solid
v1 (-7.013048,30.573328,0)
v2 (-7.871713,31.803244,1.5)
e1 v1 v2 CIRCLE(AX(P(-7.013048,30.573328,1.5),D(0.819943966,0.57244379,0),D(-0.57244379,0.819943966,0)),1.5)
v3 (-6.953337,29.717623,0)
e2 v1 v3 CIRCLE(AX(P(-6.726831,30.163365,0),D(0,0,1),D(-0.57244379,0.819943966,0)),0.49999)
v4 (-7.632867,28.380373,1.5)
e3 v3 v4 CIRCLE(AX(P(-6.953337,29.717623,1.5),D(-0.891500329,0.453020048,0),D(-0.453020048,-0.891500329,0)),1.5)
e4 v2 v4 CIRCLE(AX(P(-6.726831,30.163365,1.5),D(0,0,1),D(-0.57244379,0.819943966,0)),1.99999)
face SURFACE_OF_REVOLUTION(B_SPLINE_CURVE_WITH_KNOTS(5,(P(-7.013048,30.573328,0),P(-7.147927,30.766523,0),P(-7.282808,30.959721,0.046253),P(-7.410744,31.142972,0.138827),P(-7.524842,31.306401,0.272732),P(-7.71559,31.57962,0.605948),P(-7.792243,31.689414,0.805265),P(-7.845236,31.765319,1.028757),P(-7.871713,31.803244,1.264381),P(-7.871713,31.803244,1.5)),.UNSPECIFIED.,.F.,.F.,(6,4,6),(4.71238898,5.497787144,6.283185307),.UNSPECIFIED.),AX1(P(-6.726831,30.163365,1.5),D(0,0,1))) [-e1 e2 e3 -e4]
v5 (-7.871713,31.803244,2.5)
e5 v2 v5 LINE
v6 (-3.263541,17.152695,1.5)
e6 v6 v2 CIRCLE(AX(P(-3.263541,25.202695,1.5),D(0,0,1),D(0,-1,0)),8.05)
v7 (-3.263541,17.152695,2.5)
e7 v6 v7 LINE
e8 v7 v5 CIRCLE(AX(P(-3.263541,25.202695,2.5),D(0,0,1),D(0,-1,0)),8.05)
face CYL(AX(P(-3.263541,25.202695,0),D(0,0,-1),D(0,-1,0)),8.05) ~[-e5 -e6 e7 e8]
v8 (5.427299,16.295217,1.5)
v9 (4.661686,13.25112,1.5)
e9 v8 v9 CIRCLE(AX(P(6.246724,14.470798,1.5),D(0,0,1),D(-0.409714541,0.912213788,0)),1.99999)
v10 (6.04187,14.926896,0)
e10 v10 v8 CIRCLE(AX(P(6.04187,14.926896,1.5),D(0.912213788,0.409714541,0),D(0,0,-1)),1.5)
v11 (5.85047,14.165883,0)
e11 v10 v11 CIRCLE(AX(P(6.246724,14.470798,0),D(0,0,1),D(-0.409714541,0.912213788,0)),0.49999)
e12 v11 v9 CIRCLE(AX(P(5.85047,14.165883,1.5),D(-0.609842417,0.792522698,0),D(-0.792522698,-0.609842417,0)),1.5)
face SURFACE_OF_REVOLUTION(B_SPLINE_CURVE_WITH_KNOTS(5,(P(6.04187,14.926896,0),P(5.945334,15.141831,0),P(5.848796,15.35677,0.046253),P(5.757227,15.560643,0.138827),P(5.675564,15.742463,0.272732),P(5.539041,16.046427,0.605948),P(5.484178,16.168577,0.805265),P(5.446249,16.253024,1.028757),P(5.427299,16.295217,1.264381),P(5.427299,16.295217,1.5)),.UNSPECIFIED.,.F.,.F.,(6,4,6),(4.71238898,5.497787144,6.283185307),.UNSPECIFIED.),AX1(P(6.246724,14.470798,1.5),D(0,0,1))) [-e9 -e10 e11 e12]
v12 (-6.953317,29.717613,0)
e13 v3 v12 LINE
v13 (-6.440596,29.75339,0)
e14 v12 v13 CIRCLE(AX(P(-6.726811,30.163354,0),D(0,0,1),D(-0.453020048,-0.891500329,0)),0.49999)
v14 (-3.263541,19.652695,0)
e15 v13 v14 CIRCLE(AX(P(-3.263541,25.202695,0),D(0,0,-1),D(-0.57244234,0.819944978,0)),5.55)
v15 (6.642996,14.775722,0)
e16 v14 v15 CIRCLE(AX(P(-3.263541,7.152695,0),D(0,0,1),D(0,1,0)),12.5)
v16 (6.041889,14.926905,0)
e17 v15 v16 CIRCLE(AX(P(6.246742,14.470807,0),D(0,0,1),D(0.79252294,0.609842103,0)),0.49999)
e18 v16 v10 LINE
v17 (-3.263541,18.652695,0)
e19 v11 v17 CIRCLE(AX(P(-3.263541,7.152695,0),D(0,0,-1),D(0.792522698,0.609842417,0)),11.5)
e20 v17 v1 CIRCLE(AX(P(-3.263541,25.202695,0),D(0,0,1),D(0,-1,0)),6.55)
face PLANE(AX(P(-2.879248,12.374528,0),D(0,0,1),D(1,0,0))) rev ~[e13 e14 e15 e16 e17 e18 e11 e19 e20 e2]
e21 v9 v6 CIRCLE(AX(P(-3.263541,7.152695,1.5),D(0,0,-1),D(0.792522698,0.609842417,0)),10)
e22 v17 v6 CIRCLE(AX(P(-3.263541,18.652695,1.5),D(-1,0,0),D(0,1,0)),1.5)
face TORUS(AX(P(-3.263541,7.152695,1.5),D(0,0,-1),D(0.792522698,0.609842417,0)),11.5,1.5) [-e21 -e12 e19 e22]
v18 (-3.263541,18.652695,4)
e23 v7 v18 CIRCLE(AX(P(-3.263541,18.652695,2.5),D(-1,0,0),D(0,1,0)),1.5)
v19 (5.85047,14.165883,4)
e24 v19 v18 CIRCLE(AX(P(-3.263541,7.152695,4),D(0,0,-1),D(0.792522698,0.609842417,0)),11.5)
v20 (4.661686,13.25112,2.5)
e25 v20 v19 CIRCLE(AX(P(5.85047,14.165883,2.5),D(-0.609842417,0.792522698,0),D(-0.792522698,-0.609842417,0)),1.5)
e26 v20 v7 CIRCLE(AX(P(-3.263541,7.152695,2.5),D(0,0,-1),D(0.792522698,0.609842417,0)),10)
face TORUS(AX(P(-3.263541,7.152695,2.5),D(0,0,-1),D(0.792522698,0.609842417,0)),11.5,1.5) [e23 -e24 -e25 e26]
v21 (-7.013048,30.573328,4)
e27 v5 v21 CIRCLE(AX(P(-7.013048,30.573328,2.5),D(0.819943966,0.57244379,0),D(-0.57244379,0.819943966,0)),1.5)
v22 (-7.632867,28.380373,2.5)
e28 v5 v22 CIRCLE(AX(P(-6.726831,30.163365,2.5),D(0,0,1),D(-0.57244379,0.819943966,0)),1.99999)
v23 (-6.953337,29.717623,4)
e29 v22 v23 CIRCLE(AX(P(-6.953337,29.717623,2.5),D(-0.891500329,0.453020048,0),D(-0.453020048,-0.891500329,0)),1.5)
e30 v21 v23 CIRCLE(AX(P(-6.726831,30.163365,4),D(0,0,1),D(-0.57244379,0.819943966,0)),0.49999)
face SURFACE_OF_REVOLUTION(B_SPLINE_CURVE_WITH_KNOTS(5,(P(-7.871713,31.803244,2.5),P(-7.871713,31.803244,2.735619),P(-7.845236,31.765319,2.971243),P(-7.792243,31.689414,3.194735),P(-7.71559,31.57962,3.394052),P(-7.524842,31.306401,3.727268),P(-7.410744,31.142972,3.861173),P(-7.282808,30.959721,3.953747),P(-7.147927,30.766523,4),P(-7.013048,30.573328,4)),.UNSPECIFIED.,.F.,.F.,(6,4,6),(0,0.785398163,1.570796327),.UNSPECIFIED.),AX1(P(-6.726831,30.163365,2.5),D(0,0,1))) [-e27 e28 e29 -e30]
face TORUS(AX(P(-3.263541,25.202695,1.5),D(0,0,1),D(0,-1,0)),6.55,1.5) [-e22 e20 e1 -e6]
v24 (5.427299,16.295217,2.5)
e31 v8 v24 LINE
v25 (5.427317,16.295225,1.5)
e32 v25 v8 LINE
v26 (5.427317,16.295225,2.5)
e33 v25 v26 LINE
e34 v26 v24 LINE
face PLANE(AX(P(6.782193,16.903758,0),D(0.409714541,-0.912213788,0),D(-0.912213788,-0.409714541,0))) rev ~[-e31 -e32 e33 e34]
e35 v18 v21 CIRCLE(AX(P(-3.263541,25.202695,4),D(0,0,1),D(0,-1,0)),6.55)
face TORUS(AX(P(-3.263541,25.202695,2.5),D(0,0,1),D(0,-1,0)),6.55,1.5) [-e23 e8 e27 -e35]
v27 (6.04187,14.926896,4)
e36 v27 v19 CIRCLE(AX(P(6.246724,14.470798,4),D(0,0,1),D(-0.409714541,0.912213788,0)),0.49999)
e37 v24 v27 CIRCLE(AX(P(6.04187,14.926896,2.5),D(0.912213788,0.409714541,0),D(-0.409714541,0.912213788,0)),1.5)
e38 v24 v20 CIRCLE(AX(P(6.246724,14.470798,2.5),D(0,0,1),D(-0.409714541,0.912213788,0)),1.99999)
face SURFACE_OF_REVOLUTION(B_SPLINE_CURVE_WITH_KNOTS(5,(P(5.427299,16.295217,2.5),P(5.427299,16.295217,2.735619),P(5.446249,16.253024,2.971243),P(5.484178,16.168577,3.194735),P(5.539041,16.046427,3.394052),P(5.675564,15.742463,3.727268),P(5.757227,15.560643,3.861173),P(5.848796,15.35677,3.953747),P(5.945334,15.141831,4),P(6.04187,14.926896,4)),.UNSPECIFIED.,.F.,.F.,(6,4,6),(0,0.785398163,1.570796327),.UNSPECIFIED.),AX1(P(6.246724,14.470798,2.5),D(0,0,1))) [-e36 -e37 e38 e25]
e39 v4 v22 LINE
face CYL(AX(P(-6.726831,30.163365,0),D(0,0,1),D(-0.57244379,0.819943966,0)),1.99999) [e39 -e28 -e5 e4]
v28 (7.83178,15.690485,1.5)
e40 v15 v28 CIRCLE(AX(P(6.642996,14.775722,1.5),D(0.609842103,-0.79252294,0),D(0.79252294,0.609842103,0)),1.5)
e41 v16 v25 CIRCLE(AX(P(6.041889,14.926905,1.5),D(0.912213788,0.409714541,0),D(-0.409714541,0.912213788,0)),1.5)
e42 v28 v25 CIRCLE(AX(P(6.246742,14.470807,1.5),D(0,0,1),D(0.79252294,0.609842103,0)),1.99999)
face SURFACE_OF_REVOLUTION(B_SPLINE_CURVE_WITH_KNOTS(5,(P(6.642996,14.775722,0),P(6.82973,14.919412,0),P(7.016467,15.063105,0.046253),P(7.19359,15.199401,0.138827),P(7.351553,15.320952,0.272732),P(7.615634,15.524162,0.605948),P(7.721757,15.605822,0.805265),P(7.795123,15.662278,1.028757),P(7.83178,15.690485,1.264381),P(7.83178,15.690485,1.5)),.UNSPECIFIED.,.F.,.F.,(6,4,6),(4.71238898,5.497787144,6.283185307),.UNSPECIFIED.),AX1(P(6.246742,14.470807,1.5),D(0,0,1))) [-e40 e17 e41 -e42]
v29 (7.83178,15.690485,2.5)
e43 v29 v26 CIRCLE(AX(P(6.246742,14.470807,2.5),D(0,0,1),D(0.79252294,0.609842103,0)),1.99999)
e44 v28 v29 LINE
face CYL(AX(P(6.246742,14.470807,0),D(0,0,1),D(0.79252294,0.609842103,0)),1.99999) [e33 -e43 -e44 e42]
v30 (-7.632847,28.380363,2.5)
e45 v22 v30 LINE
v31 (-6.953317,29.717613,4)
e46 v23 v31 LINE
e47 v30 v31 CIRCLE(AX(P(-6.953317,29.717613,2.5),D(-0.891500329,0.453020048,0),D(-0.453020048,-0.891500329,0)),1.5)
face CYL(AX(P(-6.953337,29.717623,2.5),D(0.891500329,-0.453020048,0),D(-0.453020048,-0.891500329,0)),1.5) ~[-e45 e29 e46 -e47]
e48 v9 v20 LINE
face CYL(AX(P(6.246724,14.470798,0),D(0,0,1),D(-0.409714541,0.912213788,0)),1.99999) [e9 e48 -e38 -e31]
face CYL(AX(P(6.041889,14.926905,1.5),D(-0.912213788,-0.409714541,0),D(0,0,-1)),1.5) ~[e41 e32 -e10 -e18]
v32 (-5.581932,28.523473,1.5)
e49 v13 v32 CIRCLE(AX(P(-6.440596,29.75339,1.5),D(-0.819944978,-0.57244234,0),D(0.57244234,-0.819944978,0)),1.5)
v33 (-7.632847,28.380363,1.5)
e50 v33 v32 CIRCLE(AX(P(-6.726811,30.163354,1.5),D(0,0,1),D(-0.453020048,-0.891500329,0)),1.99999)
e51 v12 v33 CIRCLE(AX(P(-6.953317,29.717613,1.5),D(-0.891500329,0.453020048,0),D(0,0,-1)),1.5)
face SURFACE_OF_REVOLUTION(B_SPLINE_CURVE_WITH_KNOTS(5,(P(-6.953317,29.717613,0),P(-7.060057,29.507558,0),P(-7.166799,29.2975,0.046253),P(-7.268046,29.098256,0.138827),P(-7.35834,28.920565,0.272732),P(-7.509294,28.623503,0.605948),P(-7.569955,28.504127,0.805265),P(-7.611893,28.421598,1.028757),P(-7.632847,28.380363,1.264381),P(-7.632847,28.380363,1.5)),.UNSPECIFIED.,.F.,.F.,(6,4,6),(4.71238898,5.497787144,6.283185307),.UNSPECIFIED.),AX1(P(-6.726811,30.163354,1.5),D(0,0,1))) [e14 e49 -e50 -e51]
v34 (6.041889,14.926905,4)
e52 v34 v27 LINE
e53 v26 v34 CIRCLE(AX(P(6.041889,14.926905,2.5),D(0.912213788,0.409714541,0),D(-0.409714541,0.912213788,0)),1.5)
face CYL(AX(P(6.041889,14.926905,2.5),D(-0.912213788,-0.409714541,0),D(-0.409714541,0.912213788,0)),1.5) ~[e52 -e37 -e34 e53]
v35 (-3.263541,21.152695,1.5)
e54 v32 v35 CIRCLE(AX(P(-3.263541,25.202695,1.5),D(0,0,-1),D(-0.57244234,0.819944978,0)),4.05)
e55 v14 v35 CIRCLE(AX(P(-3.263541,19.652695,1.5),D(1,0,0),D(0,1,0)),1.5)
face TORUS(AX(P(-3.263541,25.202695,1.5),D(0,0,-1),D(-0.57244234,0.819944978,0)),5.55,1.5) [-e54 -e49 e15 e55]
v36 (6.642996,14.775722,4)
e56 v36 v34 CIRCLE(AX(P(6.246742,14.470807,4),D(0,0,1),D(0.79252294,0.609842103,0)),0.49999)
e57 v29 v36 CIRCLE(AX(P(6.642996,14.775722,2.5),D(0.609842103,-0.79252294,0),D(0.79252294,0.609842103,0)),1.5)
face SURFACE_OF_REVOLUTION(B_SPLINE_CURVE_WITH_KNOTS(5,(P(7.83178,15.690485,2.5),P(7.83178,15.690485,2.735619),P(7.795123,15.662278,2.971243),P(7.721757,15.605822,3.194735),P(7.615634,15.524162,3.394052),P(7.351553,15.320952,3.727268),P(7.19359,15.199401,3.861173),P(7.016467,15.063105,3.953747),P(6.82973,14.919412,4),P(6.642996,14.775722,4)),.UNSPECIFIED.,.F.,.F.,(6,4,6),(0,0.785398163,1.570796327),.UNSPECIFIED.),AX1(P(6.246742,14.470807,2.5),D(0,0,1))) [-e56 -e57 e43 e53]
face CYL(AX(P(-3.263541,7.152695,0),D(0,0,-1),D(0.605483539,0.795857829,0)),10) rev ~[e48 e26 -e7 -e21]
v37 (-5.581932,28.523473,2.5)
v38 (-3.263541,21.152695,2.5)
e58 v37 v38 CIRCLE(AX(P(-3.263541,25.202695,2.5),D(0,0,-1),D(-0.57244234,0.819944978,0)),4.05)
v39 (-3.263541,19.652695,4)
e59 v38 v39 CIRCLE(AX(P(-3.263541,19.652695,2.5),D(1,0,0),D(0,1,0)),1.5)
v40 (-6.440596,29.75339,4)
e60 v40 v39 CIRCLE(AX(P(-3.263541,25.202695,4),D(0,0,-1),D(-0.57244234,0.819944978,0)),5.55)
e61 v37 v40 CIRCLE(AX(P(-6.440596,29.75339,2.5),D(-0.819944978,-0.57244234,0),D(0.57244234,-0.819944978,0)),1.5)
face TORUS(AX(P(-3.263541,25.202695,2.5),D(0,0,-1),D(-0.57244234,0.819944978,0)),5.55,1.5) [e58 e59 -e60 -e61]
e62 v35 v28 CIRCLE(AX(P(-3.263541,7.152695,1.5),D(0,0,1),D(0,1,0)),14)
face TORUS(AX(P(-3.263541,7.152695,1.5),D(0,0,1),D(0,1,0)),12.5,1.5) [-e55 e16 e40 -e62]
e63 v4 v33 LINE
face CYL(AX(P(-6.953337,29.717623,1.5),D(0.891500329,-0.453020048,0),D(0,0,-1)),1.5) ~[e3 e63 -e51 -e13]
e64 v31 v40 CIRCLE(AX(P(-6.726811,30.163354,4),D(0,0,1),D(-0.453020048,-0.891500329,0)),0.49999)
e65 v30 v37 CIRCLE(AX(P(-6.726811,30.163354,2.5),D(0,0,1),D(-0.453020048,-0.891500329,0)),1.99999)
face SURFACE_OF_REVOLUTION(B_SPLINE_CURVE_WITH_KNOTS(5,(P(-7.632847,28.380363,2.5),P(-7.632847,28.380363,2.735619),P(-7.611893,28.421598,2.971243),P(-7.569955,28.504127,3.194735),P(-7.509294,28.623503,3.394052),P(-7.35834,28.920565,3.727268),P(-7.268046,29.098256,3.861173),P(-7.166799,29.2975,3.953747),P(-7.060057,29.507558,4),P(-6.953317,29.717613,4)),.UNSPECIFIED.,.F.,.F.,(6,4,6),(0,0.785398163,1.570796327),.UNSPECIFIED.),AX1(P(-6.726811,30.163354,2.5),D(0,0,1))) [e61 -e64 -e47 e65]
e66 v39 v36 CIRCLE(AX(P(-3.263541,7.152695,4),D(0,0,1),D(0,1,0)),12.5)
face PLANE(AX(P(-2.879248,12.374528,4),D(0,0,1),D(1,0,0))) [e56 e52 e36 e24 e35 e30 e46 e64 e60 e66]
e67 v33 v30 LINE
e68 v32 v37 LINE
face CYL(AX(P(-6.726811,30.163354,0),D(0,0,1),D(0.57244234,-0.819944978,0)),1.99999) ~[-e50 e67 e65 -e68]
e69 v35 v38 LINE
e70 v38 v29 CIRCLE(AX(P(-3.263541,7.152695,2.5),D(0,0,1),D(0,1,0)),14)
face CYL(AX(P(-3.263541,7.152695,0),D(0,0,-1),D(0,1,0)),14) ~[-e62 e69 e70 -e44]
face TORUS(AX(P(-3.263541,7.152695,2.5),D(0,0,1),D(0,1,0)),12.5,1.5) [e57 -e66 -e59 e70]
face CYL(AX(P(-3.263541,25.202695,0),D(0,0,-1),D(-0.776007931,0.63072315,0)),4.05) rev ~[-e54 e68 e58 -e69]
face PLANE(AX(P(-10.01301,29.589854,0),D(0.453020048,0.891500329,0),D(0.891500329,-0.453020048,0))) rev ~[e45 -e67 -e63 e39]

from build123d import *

# Parameters (mm, degrees)
F1_DEPTH = 4
F2_R     = 1.99999
F3_R     = 1.5


# Not quite as in the source:
# - a fillet or chamfer is up to 0.001 mm smaller than in the source, because OpenCascade refuses the exact size


with BuildPart() as f1:
    # F0 (on Top) → F1 (new body)
    with BuildSketch(Plane.XY):
        with BuildLine():
            ThreePointArc((-6.4063729182, 27.757124237), (0.3935028475, 26.9429632102), (-3.2635407988, 21.152695481))
            ThreePointArc((-3.2635407988, 21.152695481), (-8.7172147503, -5.7413900015), (6.782193219, 16.9037583997))
            Line((6.782193219, 16.9037583997), (2.7912945952, 15.1112737681))
            ThreePointArc((2.7912945952, 15.1112737681), (-6.4583973785, -2.3232156327), (-3.2635407988, 17.152695481))
            ThreePointArc((-3.2635407988, 17.152695481), (3.8117374796, 29.0423487575), (-10.0130104693, 29.5898539199))
            Line((-10.0130104693, 29.5898539199), (-6.4063729182, 27.757124237))
        make_face()
    extrude(amount=F1_DEPTH)

    # F2 (radius 2 in the source; OpenCascade refuses exactly that, so slightly less here)
    f2_edges = [f1.edges().sort_by_distance(p)[0] for p in [
        (-10.01301, 29.589854, 2),
        (-6.406373, 27.757124, 2),
        (2.791295, 15.111274, 2),
        (6.782193, 16.903758, 2),
    ]]
    fillet(f2_edges, radius=F2_R)

    # F3
    f3_edges = [f1.edges().sort_by_distance(p)[0] for p in [
        (-9.447025, -5.407739, 4),
        (-9.447025, -5.407739, 0),
    ]]
    fillet(f3_edges, radius=F3_R)


solid = f1.part
